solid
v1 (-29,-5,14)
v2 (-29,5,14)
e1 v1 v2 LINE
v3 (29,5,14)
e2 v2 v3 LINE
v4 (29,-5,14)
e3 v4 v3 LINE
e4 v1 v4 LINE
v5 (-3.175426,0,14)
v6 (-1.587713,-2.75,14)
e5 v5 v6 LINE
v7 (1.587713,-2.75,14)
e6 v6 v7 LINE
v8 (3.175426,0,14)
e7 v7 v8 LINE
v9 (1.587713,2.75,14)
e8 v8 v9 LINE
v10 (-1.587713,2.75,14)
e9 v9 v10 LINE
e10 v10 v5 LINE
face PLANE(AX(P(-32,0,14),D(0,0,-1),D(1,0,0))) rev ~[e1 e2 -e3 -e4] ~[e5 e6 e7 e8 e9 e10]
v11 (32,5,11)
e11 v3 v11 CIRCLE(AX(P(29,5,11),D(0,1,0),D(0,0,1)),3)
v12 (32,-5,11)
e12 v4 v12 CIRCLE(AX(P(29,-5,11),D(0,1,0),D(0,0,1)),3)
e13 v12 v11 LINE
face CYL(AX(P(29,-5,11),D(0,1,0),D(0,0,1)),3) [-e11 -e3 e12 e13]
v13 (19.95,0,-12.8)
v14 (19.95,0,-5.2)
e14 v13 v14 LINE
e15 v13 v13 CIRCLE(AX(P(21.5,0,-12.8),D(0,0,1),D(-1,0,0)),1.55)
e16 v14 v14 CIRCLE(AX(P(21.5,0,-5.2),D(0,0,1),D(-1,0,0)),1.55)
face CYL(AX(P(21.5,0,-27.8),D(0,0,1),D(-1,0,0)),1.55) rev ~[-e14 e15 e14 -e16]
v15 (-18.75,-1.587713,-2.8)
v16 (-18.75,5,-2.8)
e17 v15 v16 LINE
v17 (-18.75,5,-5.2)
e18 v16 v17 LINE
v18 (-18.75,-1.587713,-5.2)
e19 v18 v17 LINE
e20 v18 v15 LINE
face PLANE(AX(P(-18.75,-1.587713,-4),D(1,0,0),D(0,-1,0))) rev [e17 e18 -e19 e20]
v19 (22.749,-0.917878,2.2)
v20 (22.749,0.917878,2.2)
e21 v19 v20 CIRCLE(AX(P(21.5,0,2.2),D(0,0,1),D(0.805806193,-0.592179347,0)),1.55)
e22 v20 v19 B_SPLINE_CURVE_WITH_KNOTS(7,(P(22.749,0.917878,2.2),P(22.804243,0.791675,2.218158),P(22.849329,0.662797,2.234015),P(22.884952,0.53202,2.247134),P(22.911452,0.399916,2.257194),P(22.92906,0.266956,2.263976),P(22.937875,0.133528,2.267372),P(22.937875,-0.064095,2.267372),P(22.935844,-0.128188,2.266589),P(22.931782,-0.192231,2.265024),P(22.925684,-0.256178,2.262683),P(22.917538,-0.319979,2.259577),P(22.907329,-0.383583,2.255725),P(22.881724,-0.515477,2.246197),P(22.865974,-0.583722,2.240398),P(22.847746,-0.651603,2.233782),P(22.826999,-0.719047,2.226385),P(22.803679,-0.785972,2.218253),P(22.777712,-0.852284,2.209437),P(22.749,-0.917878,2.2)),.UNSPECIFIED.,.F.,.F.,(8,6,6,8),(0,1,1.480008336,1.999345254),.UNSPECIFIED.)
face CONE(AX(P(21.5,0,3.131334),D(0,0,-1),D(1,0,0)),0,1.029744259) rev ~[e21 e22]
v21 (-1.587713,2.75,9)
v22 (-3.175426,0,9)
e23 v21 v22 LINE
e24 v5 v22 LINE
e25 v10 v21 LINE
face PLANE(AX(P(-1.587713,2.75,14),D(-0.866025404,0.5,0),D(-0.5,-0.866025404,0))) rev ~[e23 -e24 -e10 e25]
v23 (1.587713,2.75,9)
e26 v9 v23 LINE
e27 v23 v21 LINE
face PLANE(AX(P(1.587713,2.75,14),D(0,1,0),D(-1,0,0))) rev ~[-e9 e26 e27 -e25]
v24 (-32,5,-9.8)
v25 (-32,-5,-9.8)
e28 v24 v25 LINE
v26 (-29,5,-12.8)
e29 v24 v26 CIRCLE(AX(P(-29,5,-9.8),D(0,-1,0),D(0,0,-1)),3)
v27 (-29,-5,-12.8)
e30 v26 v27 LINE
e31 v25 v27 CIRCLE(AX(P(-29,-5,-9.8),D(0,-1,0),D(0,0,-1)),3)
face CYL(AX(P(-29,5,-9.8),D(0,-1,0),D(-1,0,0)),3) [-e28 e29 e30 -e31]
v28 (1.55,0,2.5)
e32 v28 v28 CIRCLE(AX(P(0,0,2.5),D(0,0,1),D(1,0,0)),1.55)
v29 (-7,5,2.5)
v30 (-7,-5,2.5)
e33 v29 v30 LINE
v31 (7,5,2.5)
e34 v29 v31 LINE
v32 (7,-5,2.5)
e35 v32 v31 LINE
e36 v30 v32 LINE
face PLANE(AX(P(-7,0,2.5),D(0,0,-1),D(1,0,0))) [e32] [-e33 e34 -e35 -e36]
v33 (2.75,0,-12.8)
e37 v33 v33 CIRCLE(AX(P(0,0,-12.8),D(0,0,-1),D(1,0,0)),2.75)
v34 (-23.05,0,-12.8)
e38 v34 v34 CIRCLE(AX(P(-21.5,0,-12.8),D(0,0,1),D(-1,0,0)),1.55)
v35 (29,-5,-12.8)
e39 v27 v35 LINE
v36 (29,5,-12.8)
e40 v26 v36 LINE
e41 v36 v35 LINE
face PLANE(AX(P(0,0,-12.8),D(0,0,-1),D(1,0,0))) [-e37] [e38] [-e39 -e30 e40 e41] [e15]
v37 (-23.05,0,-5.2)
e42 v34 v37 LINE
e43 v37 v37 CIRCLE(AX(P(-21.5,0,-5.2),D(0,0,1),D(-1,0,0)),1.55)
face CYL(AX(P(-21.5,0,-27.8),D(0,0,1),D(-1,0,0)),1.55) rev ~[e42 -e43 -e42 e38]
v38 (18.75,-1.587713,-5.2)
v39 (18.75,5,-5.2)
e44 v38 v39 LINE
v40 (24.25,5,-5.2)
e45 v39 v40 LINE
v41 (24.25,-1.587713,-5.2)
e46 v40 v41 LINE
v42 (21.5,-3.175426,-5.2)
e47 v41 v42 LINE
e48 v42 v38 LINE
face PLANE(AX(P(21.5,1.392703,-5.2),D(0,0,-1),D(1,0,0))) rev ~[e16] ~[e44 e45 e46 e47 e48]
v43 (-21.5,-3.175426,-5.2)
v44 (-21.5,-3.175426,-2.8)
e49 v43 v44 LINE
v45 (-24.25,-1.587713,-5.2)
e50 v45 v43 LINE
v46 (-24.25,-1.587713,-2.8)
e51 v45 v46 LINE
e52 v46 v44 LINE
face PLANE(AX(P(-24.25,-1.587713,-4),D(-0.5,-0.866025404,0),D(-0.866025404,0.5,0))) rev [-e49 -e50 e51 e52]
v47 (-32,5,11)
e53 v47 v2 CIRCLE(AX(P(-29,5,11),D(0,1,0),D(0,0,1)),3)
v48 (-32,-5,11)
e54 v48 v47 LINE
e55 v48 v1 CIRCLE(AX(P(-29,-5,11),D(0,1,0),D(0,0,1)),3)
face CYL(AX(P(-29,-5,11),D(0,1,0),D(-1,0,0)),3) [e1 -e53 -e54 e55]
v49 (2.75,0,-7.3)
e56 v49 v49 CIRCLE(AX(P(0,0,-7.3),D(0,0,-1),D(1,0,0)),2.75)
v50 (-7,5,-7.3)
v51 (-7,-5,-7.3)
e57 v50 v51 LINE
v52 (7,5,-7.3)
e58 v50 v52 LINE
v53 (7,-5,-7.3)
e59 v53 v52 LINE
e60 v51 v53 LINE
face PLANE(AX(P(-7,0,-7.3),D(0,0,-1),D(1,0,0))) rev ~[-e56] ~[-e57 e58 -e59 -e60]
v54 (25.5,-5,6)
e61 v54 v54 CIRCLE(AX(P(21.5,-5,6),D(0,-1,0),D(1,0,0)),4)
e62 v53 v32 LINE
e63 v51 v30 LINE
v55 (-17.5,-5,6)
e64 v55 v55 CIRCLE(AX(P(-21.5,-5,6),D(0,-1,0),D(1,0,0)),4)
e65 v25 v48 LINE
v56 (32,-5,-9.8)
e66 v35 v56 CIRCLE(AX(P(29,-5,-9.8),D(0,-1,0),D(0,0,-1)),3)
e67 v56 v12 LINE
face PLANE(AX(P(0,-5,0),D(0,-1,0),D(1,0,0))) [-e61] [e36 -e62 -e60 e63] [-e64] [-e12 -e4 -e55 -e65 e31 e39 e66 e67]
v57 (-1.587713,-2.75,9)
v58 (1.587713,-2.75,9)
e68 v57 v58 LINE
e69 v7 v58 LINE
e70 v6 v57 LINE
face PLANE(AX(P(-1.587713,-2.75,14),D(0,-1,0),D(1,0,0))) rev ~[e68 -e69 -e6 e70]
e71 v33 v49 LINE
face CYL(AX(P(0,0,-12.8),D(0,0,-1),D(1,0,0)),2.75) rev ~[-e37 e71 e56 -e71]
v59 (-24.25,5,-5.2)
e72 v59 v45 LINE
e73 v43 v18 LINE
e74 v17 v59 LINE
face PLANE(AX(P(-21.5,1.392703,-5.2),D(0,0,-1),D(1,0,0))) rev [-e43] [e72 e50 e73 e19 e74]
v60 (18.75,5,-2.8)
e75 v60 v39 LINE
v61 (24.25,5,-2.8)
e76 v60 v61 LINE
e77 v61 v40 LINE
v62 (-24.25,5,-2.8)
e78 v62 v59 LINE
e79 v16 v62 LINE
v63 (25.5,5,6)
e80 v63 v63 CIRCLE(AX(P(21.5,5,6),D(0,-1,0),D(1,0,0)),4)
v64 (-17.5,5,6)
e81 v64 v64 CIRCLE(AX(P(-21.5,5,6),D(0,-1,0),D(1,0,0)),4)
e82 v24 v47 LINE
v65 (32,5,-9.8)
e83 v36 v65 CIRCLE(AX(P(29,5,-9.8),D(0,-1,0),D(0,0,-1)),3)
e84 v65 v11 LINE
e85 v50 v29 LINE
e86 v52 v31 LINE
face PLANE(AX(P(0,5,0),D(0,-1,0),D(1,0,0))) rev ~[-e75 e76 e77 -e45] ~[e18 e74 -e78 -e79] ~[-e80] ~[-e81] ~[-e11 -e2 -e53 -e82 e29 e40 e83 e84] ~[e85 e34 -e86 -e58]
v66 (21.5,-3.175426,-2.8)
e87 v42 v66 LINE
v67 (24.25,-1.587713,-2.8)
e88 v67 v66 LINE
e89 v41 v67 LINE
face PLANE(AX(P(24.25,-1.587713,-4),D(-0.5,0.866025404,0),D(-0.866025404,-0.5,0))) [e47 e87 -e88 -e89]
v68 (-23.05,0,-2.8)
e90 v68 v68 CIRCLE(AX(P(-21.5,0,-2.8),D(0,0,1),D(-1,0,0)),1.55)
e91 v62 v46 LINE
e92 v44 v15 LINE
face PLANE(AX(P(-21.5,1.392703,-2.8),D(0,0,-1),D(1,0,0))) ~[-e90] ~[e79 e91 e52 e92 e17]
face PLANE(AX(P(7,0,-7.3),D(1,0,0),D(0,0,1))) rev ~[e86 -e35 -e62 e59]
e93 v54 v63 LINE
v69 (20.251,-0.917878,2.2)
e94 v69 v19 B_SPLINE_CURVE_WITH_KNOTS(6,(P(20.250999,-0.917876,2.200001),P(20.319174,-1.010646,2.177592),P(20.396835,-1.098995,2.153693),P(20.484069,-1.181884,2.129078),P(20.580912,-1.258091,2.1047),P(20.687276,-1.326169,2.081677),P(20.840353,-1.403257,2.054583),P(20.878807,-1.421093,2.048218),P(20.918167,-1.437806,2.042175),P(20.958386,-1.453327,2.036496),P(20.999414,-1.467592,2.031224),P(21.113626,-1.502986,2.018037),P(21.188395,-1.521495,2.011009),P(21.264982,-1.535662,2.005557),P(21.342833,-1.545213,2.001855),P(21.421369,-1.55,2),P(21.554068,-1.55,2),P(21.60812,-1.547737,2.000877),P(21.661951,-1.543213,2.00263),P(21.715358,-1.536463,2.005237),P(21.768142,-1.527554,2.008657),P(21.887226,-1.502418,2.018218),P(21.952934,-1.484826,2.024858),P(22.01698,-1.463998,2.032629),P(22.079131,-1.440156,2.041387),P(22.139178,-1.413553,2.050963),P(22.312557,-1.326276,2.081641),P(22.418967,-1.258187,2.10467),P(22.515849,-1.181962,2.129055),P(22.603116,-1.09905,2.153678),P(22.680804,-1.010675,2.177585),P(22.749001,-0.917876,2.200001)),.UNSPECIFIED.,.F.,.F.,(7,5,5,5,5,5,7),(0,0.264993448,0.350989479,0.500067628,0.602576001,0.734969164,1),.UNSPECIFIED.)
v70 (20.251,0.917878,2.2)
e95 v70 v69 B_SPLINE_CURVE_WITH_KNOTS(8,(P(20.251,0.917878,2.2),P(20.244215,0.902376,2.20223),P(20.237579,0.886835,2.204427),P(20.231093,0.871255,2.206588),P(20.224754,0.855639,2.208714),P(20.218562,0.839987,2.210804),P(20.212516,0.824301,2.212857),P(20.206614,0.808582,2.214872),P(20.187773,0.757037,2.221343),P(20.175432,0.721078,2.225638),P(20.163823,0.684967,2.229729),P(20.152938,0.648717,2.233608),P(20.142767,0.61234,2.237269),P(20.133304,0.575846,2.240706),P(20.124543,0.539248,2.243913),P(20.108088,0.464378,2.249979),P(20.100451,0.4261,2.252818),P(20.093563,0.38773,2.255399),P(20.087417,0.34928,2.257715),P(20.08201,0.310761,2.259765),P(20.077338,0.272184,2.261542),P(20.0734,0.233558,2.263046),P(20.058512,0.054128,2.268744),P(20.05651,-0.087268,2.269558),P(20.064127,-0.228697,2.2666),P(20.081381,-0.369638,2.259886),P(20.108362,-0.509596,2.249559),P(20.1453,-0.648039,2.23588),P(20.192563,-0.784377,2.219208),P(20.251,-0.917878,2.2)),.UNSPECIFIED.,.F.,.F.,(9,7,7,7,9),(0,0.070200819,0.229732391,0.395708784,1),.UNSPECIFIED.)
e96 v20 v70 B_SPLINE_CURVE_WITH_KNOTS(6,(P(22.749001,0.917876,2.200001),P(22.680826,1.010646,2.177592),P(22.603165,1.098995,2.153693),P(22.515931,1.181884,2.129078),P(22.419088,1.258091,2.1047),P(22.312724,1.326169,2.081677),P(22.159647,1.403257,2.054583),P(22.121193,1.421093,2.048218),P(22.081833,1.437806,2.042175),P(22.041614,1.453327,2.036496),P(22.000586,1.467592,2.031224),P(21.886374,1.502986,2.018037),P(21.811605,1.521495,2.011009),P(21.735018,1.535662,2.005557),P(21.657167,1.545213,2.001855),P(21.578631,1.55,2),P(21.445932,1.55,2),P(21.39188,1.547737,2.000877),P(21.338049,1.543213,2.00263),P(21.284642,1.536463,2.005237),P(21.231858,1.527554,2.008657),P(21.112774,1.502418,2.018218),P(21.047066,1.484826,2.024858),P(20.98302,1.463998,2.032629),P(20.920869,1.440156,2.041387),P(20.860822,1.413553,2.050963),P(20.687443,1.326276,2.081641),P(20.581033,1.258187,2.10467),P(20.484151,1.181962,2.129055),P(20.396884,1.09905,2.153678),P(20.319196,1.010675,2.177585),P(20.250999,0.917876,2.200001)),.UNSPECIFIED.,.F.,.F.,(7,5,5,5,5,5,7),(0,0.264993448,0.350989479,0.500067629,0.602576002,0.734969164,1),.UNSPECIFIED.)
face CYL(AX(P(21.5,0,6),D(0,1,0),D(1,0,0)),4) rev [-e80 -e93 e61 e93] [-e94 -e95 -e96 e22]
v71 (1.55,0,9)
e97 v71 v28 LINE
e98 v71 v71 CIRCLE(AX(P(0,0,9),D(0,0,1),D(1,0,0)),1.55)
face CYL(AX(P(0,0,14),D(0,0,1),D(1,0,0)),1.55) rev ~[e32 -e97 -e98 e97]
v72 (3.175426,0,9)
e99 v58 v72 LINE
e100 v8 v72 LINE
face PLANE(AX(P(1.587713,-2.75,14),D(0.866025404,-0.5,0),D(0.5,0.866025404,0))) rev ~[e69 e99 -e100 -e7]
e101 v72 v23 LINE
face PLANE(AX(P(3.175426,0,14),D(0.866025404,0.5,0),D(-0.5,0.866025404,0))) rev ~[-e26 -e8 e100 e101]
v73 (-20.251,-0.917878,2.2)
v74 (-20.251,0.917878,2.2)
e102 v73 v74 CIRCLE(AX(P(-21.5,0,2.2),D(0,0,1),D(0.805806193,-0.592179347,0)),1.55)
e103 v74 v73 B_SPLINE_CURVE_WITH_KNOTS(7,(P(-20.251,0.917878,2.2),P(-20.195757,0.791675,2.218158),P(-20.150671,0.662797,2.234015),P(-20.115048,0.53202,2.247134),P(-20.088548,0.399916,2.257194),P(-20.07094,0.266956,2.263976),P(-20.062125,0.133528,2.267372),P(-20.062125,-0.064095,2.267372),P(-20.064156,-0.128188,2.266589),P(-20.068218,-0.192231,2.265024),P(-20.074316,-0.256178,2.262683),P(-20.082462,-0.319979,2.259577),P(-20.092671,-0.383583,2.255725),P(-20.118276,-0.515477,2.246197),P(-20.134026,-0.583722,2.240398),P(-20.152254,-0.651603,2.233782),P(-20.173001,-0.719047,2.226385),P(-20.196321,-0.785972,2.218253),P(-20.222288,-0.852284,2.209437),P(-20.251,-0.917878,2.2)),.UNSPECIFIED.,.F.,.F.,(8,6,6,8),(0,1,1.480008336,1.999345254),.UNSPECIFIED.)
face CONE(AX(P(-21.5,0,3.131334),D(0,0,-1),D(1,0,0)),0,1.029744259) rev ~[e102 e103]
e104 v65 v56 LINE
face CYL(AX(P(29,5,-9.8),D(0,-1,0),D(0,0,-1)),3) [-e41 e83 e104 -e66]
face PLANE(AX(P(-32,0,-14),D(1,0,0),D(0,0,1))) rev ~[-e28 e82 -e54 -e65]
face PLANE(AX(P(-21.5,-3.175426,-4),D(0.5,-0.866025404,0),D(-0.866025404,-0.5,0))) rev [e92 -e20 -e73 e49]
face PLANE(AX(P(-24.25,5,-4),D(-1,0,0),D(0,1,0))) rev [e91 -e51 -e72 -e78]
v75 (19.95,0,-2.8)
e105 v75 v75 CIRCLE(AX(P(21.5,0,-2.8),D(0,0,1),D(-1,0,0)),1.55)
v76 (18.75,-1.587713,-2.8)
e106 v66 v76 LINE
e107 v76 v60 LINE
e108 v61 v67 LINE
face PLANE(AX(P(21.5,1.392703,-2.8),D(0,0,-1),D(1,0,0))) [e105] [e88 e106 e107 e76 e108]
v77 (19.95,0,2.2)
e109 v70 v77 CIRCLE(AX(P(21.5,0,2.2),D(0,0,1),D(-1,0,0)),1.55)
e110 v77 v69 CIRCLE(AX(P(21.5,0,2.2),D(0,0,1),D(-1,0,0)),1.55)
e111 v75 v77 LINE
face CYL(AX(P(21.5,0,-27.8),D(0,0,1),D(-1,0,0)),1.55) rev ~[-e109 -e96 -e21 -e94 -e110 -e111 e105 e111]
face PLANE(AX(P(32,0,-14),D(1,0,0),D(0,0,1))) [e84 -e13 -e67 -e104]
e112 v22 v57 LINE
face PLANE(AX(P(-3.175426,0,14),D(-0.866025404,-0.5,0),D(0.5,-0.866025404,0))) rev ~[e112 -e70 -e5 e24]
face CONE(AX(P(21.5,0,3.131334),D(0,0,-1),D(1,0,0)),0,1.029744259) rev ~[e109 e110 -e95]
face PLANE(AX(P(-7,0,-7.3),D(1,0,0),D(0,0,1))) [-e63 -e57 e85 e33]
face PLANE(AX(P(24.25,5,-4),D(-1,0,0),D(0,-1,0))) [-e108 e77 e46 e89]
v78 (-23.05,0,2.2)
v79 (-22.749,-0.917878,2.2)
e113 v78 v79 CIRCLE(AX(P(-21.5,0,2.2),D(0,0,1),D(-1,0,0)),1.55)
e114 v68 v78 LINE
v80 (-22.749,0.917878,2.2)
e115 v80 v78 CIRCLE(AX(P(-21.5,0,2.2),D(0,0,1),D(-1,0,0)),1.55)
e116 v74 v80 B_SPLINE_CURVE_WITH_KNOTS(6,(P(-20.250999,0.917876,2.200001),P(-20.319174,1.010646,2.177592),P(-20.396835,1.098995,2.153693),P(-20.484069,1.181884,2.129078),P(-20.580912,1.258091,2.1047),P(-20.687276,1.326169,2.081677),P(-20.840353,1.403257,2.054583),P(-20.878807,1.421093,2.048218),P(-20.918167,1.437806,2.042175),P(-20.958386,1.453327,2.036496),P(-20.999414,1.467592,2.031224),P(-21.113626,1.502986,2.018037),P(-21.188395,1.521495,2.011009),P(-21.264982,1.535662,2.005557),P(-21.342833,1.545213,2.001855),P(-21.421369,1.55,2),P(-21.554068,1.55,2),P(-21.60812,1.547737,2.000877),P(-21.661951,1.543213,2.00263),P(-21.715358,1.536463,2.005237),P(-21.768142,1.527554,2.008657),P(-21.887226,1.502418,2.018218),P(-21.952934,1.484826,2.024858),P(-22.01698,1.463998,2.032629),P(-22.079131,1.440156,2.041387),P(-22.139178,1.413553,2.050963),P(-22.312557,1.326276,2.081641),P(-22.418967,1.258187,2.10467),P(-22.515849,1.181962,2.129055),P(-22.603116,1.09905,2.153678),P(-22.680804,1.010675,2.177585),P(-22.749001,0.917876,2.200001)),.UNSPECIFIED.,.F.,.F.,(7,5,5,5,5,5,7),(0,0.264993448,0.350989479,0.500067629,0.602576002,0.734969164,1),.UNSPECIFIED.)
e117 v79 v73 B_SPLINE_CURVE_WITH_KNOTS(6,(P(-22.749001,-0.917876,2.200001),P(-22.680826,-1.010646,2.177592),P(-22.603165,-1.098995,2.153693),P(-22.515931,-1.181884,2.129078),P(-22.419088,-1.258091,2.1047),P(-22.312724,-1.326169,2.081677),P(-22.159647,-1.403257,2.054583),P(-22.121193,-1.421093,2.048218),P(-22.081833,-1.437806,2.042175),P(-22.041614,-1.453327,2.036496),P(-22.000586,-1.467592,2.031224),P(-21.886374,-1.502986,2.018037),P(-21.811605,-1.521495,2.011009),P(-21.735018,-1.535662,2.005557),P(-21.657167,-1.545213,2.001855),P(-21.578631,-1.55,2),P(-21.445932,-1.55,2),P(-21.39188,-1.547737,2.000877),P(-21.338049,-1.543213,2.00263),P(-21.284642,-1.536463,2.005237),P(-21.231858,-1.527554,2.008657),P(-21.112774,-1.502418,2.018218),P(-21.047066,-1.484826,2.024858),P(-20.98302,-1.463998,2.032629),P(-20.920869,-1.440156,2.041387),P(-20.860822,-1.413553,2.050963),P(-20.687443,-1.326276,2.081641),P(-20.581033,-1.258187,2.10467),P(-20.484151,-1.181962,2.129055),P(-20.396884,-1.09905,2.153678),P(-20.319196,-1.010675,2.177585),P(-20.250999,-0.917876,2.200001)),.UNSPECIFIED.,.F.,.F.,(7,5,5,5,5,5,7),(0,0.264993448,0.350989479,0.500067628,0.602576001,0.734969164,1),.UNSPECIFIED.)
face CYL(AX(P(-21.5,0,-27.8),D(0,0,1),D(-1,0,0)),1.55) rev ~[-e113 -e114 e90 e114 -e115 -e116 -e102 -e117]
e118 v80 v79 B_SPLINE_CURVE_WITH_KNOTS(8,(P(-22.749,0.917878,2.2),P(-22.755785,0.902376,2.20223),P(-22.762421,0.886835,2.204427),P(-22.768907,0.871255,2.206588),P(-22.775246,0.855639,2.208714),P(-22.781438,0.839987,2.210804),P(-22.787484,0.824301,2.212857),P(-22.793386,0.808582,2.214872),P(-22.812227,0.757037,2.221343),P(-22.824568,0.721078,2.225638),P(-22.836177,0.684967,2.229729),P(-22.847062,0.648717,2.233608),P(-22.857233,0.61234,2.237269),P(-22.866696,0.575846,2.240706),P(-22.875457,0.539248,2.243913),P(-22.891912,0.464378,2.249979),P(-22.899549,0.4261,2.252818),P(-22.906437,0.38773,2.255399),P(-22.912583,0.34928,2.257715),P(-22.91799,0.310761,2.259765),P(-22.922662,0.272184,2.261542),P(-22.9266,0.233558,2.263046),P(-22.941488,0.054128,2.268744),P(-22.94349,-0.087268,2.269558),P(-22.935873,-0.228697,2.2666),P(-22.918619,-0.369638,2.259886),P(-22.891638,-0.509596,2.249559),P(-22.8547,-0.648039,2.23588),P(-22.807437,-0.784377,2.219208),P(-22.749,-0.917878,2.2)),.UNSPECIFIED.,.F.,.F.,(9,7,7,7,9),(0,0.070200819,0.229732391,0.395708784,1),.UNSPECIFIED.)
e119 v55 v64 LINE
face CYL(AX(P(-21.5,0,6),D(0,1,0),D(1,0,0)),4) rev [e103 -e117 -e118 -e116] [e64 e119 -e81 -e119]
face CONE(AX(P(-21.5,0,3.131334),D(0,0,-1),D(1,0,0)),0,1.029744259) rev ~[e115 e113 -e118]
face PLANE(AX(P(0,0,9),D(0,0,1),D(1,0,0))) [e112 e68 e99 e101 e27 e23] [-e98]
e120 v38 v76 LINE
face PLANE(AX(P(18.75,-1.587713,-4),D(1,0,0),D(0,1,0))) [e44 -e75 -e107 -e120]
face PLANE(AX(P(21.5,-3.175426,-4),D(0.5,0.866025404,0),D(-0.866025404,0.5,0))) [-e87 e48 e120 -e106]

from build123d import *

# Parameters (mm, degrees)
F0_W      = 64
F0_H      = 28
F0_W_2    = 14
F0_H_2    = 9.8
F0_R      = 4
F1_DEPTH  = 5
F1_FACE_W = 64
F1_FACE_H = 10
F4_DEPTH  = 1.2
F5_DEPTH  = 1.2
F7_D      = 3.1
F7_DEPTH  = 15
F7_TIP    = 0.9313339595
F8_R      = 2.75
F9_DEPTH  = 5.5
F10_R     = 1.55
F11_DEPTH = 5
F12_DEPTH = 11.5
F13_R     = 3


# Not quite as in the source:
# - a pattern or mirror of a feature is missing from the dataset's text; its kind, count and spacing are read off the source's solid


with BuildPart() as f1:
    # F0 (on Front) → F1 (new body, symmetric)
    with BuildSketch(Plane.XZ):
        Rectangle(F0_W, F0_H)
        with Locations((0, -2.4)):
            Rectangle(F0_W_2, F0_H_2, mode=Mode.SUBTRACT)
        with Locations((-21.5, 6)):
            Circle(F0_R, mode=Mode.SUBTRACT)
        with Locations((21.5, 6)):
            Circle(F0_R, mode=Mode.SUBTRACT)
    extrude(amount=F1_DEPTH, both=True)

    # F3 (on offset) + F1_face (on face) → F4 (cut, symmetric)
    with BuildSketch(Plane(origin=(0, 0, -4), x_dir=(1, 0, 0), z_dir=(0, 0, -1))):
        Polygon((18.75, 1.5877132403), (18.75, -1.5877132403), (18.75, -5), (24.25, -5), (24.25, 1.5877132403), (21.5, 3.1754264805), align=None)
    with BuildSketch(Plane(origin=(0, 0, -14), x_dir=(1, 0, 0), z_dir=(0, 0, -1))):
        Rectangle(F1_FACE_W, F1_FACE_H)
    extrude(amount=F4_DEPTH, both=True, mode=Mode.SUBTRACT)

    # F3 (on offset) → F5 (cut, symmetric)
    with BuildSketch(Plane(origin=(0, 0, -4), x_dir=(1, 0, 0), z_dir=(0, 0, -1))):
        Polygon((18.75, 1.5877132403), (18.75, -1.5877132403), (18.75, -5), (24.25, -5), (24.25, 1.5877132403), (21.5, 3.1754264805), align=None)
    f5 = extrude(amount=F5_DEPTH, both=True, mode=Mode.SUBTRACT)

    # F5_copies: F5 across plane
    add(f5.mirror(Plane(origin=(0, 0, 0), x_dir=(0, 0, -1), z_dir=(-1, 0, 0))), mode=Mode.SUBTRACT)

    # F7
    with Locations(Plane(origin=(0, 0, -12.8), x_dir=(1, 0, 0), z_dir=(0, 0, -1))):
        with Locations((21.5, 0), (-21.5, 0)):
            Hole(F7_D / 2, depth=F7_DEPTH)
            with Locations((0, 0, -(F7_DEPTH + F7_TIP / 2))):  # 118° drill point
                Cone(0, F7_D / 2, F7_TIP, mode=Mode.SUBTRACT)

    # F8 (on face) → F9 (cut, through all)
    with BuildSketch(Plane(origin=(0, 0, -12.8), x_dir=(1, 0, 0), z_dir=(0, 0, -1))):
        Circle(F8_R)
    extrude(amount=-F9_DEPTH, mode=Mode.SUBTRACT)

    # F10 (on face) → F11 (cut)
    with BuildSketch(Plane.XY.offset(14)):
        Polygon((-1.5877132403, -2.75), (1.5877132403, -2.75), (3.1754264805, 0), (1.5877132403, 2.75), (-1.5877132403, 2.75), (-3.1754264805, 0), align=None)
        Circle(F10_R, mode=Mode.SUBTRACT)
    extrude(amount=-F11_DEPTH, mode=Mode.SUBTRACT)

    # F12 (cut, through all): a face of the model
    f12_faces = [f1.faces().sort_by_distance(p)[0] for p in [
        (0, 0, 14),
    ]]
    extrude(f12_faces, amount=-F12_DEPTH, mode=Mode.SUBTRACT)

    # F13
    f13_edges = [f1.edges().sort_by_distance(p)[0] for p in [
        (32, 0, 14),
        (-32, 0, 14),
        (32, 0, -12.8),
        (-32, 0, -12.8),
    ]]
    fillet(f13_edges, radius=F13_R)


solid = f1.part
